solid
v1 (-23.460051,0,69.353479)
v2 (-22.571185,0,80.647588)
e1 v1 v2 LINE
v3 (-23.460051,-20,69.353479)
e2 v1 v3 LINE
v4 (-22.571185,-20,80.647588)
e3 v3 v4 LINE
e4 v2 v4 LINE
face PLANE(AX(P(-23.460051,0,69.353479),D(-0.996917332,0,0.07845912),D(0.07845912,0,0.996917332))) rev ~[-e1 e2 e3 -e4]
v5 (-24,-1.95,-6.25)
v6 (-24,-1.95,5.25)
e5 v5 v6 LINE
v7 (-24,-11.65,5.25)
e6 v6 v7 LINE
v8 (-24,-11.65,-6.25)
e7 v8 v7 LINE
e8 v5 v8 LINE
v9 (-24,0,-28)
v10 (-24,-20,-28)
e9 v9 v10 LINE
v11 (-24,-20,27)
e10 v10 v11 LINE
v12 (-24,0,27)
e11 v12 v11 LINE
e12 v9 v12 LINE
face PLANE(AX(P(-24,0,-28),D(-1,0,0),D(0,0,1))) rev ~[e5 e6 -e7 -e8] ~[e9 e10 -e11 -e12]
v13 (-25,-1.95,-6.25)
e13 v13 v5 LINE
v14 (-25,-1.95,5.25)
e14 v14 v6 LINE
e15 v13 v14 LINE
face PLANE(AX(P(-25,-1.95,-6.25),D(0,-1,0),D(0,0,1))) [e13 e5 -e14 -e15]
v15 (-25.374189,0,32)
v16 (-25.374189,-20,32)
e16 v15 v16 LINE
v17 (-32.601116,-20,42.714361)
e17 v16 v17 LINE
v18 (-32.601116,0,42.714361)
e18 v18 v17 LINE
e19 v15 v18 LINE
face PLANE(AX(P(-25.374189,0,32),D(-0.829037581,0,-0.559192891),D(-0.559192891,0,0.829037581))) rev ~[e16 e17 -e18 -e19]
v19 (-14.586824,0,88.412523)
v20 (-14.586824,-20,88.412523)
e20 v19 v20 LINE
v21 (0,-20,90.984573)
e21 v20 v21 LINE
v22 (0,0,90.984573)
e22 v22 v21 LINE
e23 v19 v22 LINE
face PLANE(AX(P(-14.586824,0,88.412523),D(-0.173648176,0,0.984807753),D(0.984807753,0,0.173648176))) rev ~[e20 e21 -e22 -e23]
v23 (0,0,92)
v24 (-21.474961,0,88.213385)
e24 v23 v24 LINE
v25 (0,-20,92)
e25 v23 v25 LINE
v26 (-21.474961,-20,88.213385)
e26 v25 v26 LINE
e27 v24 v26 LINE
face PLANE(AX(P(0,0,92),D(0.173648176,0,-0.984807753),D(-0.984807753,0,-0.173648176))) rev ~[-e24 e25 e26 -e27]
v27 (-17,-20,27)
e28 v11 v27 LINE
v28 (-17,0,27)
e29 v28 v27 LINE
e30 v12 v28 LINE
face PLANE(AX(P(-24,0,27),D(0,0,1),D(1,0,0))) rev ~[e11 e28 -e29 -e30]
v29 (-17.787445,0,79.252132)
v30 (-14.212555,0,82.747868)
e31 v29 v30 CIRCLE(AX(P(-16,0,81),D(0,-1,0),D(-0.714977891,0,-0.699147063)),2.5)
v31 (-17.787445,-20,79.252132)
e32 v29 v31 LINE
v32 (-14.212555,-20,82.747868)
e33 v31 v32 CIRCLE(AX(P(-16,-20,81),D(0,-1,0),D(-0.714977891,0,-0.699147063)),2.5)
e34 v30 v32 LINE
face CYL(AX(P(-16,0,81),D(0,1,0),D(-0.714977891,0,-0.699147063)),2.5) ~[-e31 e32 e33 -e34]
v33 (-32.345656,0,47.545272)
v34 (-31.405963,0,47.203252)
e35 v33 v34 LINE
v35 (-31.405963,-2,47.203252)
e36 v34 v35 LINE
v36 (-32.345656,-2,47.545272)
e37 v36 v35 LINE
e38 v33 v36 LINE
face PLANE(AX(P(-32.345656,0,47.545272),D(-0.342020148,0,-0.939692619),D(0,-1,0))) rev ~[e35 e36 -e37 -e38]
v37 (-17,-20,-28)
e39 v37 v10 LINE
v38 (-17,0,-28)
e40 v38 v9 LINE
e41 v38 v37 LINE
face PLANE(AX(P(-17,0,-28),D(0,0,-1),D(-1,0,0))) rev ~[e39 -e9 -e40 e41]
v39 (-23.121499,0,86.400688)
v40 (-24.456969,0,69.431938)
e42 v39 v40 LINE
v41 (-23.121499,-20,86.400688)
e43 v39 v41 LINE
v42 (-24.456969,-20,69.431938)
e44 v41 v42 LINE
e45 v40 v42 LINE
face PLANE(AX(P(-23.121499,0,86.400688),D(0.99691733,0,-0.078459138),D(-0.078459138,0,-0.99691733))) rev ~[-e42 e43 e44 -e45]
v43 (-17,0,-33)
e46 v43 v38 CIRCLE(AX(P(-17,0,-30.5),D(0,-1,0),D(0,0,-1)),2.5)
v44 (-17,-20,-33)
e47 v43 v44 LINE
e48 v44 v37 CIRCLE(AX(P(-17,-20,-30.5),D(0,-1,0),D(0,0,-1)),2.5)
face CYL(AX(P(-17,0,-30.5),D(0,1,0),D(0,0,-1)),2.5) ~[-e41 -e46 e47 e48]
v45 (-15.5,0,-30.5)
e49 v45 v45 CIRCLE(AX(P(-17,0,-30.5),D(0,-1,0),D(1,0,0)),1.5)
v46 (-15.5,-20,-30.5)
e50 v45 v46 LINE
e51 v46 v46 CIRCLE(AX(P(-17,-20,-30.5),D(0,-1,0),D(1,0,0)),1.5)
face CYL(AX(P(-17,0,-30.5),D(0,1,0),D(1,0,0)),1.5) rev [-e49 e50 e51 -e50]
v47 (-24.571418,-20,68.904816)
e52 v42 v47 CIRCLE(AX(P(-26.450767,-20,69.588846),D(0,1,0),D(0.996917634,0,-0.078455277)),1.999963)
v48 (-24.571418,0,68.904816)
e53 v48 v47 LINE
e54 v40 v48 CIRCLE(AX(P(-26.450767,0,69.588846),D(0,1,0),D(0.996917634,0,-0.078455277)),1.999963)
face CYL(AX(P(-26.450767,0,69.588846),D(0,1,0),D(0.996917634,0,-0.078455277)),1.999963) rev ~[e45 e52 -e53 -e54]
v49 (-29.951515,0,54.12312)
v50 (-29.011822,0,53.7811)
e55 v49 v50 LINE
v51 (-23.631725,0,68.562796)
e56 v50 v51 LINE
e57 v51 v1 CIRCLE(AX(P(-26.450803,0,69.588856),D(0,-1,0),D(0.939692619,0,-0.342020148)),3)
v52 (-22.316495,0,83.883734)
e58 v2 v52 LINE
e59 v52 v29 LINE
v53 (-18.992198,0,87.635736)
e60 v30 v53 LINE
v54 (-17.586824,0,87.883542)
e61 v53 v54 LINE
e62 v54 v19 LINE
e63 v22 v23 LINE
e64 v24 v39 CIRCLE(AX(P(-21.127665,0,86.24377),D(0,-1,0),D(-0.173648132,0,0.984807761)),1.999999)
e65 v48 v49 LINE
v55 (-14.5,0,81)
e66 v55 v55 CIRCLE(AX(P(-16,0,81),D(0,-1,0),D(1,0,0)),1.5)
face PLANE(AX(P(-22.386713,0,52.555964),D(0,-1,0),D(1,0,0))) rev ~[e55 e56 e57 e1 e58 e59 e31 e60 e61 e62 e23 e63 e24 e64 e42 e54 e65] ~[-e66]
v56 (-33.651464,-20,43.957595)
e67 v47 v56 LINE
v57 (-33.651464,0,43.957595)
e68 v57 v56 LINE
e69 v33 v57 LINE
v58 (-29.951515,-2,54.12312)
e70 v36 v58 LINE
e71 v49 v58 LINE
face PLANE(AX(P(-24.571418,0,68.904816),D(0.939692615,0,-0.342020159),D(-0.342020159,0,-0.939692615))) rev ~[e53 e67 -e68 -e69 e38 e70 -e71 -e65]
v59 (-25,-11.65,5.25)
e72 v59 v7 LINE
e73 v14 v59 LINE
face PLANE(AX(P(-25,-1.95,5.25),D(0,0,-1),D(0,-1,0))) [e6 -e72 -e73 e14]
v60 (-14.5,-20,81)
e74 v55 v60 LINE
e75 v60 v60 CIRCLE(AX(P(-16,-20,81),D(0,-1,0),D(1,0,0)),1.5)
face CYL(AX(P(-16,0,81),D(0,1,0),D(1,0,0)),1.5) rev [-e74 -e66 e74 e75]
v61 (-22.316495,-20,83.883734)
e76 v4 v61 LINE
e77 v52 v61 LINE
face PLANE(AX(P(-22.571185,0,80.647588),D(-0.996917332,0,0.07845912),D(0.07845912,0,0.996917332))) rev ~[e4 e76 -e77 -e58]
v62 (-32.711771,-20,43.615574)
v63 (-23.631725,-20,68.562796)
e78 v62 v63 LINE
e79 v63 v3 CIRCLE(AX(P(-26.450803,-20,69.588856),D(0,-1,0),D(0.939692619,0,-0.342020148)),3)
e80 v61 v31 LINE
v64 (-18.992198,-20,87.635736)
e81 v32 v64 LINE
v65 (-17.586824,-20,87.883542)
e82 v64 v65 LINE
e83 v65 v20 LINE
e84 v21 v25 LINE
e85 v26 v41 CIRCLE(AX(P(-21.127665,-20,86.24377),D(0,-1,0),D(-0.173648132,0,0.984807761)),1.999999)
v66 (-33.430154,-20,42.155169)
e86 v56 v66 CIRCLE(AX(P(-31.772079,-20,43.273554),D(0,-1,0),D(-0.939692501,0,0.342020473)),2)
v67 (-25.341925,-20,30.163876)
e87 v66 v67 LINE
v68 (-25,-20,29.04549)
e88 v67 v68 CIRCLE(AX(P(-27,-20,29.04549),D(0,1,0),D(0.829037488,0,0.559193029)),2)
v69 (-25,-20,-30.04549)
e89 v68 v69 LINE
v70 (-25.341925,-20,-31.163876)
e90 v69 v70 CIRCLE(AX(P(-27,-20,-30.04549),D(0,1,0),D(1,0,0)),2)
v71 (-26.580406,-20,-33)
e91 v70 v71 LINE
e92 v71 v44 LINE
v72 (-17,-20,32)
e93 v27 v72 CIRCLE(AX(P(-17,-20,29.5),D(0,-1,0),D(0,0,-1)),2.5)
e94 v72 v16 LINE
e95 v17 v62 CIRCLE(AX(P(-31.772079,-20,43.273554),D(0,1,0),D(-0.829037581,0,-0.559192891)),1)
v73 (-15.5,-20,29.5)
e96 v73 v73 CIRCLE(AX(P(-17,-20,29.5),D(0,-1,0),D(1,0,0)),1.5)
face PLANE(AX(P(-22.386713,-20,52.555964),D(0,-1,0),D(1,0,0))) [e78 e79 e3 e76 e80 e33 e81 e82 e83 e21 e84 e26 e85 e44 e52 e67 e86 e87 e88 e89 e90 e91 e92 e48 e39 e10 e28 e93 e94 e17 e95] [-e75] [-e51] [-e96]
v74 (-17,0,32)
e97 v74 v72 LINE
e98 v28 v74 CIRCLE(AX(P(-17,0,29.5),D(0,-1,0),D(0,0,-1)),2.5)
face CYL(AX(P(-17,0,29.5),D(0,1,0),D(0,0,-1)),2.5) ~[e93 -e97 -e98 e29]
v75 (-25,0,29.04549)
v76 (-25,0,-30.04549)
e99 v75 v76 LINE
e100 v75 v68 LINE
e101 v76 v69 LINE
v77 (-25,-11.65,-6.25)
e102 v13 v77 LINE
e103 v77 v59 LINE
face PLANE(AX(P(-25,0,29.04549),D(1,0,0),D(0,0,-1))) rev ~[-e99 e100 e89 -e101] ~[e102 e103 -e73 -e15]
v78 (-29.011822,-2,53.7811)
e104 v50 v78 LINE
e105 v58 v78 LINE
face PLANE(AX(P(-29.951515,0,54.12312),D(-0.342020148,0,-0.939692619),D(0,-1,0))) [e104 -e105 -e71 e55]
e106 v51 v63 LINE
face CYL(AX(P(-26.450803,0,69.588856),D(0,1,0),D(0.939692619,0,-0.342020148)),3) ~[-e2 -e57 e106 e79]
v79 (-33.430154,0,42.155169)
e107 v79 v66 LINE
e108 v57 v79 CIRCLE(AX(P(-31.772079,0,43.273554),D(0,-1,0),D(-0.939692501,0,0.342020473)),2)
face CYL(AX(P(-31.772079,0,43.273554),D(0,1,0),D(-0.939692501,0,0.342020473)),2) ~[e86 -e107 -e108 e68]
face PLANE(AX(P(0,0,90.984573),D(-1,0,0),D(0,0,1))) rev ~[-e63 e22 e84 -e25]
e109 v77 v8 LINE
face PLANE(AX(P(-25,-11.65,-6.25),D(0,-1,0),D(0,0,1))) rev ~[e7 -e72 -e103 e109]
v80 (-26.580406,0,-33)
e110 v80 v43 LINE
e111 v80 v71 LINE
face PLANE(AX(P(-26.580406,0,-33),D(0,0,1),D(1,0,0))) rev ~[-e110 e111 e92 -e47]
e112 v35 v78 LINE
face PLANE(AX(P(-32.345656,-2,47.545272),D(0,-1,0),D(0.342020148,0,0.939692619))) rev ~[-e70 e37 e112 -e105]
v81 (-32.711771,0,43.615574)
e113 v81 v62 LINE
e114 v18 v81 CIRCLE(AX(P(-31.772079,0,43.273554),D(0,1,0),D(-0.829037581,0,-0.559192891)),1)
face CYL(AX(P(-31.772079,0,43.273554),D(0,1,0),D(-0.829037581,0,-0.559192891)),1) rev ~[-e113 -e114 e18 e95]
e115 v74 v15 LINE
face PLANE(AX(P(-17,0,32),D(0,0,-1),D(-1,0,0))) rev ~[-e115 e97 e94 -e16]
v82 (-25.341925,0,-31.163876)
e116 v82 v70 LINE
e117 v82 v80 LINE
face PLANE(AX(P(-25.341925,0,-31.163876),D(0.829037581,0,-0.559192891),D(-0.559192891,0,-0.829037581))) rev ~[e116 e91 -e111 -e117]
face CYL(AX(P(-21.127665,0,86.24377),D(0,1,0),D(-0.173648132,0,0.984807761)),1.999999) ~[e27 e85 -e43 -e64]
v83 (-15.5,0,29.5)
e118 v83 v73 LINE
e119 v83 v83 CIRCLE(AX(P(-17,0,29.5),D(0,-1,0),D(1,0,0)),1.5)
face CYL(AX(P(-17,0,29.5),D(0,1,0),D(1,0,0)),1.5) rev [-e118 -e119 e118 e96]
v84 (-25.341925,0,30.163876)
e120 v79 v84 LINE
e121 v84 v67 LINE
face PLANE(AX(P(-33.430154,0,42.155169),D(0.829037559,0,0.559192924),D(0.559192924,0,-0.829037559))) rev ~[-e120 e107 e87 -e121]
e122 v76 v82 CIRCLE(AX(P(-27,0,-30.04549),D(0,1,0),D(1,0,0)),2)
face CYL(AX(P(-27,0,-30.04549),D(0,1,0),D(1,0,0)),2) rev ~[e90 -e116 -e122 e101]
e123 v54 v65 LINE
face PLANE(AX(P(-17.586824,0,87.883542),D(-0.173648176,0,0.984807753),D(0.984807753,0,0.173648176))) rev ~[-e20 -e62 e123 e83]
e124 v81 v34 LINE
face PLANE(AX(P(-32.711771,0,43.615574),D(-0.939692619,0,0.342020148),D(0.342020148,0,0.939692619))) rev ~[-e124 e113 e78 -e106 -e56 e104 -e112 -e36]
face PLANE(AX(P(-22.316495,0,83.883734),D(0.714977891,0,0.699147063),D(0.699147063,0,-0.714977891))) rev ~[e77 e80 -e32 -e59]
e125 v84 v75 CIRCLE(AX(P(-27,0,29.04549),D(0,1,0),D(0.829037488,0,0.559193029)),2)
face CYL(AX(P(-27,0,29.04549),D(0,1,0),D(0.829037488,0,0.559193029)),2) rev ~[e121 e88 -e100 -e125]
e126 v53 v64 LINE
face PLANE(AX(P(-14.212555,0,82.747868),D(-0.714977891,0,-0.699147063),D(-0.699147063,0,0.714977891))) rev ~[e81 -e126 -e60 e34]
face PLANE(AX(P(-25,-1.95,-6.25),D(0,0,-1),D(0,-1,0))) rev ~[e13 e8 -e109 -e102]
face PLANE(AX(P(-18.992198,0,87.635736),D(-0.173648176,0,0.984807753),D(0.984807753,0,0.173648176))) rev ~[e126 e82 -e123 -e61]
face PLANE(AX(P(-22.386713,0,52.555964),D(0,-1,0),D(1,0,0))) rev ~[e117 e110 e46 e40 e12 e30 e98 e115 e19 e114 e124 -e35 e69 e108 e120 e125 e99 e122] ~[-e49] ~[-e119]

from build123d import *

# Parameters (mm, degrees)
F1_R     = 1.5
F2_DEPTH = 20
F3_W     = 2
F3_H     = 7
F4_DEPTH = 25
F5_W     = 9.7
F5_H     = 11.5
F6_DEPTH = 25


# Not quite as in the source:
# - ends of sketch curves that miss each other by under 0.0002 mm in the source are joined


with BuildPart() as f2:
    # F1 (on Front) → F2 (new body)
    with BuildSketch(Plane.XZ):
        with BuildLine():
            Line((-22.3164947392, 83.8837339027), (-17.7874447277, 79.2521323433))
            ThreePointArc((-17.7874447277, 79.2521323433), (-14.2521323433, 79.2125552723), (-14.2125552723, 82.7478676567))
            Line((-14.2125552723, 82.7478676567), (-18.9921983086, 87.6357364337))
            Line((-18.9921983086, 87.6357364337), (-17.5868240881, 87.8835418245))
            Line((-17.5868240881, 87.8835418245), (-14.5868240881, 88.4125227619))
            Line((-14.5868240881, 88.4125227619), (0, 90.9845733884))
            Line((0, 90.9845733884), (0, 92))
            Line((0, 92), (-21.474961, 88.213385))
            ThreePointArc((-21.474961, 88.213385), (-22.6081005709, 87.5885032671), (-23.1214986845, 86.4006879752))
            Line((-23.1214986845, 86.4006879752), (-24.456969, 69.431938))
            ThreePointArc((-24.456969, 69.431938), (-24.4963407526, 69.1645008146), (-24.5714176946, 68.9048158888))
            Line((-24.5714176946, 68.9048158888), (-33.651464, 43.957595))
            ThreePointArc((-33.651464, 43.957595), (-33.757171385, 43.0298159786), (-33.4301544738, 42.1551686804))
            Line((-33.4301544738, 42.1551686804), (-25.341925, 30.163876))
            ThreePointArc((-25.341925, 30.163876), (-25.0873905233, 29.6302335248), (-25, 29.04549))
            Line((-25, 29.04549), (-25, 27))
            Line((-25, 27), (-25, -0.5))
            Line((-25, -0.5), (-24.0000002534, -0.5))
            Line((-24.0000002534, -0.5), (-24.0000002534, 27))
            Line((-24.0000002534, 27), (-17, 27))
            ThreePointArc((-17, 27), (-14.5, 29.5), (-17, 32))
            Line((-17, 32), (-25, 32))
            Line((-25, 32), (-25.3741885909, 32))
            Line((-25.3741885909, 32), (-32.6011163068, 42.7143612935))
            ThreePointArc((-32.6011163068, 42.7143612935), (-32.7646248248, 43.1516847064), (-32.7117713086, 43.6155740346))
            Line((-32.7117713086, 43.6155740346), (-23.6317251212, 68.5627955495))
            ThreePointArc((-23.6317251212, 68.5627955495), (-23.5191096678, 68.9523229367), (-23.4600509821, 69.3534786388))
            Line((-23.4600509821, 69.3534786388), (-22.5711850089, 80.6475881907))
            Line((-22.5711850089, 80.6475881907), (-22.3164947392, 83.8837339027))
        make_face()
        with Locations((-17, 29.5)):
            Circle(F1_R, mode=Mode.SUBTRACT)
        with Locations((-16, 81)):
            Circle(F1_R, mode=Mode.SUBTRACT)
        with BuildLine():
            Line((-24.0000002534, -28), (-24.0000002534, -0.5))
            Line((-24.0000002534, -0.5), (-25, -0.5))
            Line((-25, -0.5), (-25, -30.04549))
            ThreePointArc((-25, -30.04549), (-25.0873905233, -30.6302335248), (-25.3419249898, -31.1638760069))
            Line((-25.341925, -31.163876), (-26.5804062367, -33))
            Line((-26.5804062367, -33), (-25, -33))
            Line((-25, -33), (-17, -33))
            ThreePointArc((-17, -33), (-14.5, -30.5), (-17, -28))
            Line((-17, -28), (-24.0000002534, -28))
        make_face()
        with Locations((-17, -30.5)):
            Circle(F1_R, mode=Mode.SUBTRACT)
    extrude(amount=F2_DEPTH)

    # F3 (on face) → F4 (cut)
    with BuildSketch(Plane(origin=(-43.8426892635, 0, 15.9574341077), x_dir=(0, -1, 0), z_dir=(-0.9396926192, 0, 0.3420201476))):
        with Locations((1, 37.1150750518)):
            Rectangle(F3_W, F3_H)
    extrude(amount=-F4_DEPTH, mode=Mode.SUBTRACT)

    # F5 (on face) → F6 (cut)
    with BuildSketch(Plane(origin=(-25, 0, 0), x_dir=(0, -1, 0), z_dir=(-1, 0, 0))):
        with Locations((6.8, -0.5)):
            Rectangle(F5_W, F5_H)
    extrude(amount=-F6_DEPTH, mode=Mode.SUBTRACT)


solid = f2.part
